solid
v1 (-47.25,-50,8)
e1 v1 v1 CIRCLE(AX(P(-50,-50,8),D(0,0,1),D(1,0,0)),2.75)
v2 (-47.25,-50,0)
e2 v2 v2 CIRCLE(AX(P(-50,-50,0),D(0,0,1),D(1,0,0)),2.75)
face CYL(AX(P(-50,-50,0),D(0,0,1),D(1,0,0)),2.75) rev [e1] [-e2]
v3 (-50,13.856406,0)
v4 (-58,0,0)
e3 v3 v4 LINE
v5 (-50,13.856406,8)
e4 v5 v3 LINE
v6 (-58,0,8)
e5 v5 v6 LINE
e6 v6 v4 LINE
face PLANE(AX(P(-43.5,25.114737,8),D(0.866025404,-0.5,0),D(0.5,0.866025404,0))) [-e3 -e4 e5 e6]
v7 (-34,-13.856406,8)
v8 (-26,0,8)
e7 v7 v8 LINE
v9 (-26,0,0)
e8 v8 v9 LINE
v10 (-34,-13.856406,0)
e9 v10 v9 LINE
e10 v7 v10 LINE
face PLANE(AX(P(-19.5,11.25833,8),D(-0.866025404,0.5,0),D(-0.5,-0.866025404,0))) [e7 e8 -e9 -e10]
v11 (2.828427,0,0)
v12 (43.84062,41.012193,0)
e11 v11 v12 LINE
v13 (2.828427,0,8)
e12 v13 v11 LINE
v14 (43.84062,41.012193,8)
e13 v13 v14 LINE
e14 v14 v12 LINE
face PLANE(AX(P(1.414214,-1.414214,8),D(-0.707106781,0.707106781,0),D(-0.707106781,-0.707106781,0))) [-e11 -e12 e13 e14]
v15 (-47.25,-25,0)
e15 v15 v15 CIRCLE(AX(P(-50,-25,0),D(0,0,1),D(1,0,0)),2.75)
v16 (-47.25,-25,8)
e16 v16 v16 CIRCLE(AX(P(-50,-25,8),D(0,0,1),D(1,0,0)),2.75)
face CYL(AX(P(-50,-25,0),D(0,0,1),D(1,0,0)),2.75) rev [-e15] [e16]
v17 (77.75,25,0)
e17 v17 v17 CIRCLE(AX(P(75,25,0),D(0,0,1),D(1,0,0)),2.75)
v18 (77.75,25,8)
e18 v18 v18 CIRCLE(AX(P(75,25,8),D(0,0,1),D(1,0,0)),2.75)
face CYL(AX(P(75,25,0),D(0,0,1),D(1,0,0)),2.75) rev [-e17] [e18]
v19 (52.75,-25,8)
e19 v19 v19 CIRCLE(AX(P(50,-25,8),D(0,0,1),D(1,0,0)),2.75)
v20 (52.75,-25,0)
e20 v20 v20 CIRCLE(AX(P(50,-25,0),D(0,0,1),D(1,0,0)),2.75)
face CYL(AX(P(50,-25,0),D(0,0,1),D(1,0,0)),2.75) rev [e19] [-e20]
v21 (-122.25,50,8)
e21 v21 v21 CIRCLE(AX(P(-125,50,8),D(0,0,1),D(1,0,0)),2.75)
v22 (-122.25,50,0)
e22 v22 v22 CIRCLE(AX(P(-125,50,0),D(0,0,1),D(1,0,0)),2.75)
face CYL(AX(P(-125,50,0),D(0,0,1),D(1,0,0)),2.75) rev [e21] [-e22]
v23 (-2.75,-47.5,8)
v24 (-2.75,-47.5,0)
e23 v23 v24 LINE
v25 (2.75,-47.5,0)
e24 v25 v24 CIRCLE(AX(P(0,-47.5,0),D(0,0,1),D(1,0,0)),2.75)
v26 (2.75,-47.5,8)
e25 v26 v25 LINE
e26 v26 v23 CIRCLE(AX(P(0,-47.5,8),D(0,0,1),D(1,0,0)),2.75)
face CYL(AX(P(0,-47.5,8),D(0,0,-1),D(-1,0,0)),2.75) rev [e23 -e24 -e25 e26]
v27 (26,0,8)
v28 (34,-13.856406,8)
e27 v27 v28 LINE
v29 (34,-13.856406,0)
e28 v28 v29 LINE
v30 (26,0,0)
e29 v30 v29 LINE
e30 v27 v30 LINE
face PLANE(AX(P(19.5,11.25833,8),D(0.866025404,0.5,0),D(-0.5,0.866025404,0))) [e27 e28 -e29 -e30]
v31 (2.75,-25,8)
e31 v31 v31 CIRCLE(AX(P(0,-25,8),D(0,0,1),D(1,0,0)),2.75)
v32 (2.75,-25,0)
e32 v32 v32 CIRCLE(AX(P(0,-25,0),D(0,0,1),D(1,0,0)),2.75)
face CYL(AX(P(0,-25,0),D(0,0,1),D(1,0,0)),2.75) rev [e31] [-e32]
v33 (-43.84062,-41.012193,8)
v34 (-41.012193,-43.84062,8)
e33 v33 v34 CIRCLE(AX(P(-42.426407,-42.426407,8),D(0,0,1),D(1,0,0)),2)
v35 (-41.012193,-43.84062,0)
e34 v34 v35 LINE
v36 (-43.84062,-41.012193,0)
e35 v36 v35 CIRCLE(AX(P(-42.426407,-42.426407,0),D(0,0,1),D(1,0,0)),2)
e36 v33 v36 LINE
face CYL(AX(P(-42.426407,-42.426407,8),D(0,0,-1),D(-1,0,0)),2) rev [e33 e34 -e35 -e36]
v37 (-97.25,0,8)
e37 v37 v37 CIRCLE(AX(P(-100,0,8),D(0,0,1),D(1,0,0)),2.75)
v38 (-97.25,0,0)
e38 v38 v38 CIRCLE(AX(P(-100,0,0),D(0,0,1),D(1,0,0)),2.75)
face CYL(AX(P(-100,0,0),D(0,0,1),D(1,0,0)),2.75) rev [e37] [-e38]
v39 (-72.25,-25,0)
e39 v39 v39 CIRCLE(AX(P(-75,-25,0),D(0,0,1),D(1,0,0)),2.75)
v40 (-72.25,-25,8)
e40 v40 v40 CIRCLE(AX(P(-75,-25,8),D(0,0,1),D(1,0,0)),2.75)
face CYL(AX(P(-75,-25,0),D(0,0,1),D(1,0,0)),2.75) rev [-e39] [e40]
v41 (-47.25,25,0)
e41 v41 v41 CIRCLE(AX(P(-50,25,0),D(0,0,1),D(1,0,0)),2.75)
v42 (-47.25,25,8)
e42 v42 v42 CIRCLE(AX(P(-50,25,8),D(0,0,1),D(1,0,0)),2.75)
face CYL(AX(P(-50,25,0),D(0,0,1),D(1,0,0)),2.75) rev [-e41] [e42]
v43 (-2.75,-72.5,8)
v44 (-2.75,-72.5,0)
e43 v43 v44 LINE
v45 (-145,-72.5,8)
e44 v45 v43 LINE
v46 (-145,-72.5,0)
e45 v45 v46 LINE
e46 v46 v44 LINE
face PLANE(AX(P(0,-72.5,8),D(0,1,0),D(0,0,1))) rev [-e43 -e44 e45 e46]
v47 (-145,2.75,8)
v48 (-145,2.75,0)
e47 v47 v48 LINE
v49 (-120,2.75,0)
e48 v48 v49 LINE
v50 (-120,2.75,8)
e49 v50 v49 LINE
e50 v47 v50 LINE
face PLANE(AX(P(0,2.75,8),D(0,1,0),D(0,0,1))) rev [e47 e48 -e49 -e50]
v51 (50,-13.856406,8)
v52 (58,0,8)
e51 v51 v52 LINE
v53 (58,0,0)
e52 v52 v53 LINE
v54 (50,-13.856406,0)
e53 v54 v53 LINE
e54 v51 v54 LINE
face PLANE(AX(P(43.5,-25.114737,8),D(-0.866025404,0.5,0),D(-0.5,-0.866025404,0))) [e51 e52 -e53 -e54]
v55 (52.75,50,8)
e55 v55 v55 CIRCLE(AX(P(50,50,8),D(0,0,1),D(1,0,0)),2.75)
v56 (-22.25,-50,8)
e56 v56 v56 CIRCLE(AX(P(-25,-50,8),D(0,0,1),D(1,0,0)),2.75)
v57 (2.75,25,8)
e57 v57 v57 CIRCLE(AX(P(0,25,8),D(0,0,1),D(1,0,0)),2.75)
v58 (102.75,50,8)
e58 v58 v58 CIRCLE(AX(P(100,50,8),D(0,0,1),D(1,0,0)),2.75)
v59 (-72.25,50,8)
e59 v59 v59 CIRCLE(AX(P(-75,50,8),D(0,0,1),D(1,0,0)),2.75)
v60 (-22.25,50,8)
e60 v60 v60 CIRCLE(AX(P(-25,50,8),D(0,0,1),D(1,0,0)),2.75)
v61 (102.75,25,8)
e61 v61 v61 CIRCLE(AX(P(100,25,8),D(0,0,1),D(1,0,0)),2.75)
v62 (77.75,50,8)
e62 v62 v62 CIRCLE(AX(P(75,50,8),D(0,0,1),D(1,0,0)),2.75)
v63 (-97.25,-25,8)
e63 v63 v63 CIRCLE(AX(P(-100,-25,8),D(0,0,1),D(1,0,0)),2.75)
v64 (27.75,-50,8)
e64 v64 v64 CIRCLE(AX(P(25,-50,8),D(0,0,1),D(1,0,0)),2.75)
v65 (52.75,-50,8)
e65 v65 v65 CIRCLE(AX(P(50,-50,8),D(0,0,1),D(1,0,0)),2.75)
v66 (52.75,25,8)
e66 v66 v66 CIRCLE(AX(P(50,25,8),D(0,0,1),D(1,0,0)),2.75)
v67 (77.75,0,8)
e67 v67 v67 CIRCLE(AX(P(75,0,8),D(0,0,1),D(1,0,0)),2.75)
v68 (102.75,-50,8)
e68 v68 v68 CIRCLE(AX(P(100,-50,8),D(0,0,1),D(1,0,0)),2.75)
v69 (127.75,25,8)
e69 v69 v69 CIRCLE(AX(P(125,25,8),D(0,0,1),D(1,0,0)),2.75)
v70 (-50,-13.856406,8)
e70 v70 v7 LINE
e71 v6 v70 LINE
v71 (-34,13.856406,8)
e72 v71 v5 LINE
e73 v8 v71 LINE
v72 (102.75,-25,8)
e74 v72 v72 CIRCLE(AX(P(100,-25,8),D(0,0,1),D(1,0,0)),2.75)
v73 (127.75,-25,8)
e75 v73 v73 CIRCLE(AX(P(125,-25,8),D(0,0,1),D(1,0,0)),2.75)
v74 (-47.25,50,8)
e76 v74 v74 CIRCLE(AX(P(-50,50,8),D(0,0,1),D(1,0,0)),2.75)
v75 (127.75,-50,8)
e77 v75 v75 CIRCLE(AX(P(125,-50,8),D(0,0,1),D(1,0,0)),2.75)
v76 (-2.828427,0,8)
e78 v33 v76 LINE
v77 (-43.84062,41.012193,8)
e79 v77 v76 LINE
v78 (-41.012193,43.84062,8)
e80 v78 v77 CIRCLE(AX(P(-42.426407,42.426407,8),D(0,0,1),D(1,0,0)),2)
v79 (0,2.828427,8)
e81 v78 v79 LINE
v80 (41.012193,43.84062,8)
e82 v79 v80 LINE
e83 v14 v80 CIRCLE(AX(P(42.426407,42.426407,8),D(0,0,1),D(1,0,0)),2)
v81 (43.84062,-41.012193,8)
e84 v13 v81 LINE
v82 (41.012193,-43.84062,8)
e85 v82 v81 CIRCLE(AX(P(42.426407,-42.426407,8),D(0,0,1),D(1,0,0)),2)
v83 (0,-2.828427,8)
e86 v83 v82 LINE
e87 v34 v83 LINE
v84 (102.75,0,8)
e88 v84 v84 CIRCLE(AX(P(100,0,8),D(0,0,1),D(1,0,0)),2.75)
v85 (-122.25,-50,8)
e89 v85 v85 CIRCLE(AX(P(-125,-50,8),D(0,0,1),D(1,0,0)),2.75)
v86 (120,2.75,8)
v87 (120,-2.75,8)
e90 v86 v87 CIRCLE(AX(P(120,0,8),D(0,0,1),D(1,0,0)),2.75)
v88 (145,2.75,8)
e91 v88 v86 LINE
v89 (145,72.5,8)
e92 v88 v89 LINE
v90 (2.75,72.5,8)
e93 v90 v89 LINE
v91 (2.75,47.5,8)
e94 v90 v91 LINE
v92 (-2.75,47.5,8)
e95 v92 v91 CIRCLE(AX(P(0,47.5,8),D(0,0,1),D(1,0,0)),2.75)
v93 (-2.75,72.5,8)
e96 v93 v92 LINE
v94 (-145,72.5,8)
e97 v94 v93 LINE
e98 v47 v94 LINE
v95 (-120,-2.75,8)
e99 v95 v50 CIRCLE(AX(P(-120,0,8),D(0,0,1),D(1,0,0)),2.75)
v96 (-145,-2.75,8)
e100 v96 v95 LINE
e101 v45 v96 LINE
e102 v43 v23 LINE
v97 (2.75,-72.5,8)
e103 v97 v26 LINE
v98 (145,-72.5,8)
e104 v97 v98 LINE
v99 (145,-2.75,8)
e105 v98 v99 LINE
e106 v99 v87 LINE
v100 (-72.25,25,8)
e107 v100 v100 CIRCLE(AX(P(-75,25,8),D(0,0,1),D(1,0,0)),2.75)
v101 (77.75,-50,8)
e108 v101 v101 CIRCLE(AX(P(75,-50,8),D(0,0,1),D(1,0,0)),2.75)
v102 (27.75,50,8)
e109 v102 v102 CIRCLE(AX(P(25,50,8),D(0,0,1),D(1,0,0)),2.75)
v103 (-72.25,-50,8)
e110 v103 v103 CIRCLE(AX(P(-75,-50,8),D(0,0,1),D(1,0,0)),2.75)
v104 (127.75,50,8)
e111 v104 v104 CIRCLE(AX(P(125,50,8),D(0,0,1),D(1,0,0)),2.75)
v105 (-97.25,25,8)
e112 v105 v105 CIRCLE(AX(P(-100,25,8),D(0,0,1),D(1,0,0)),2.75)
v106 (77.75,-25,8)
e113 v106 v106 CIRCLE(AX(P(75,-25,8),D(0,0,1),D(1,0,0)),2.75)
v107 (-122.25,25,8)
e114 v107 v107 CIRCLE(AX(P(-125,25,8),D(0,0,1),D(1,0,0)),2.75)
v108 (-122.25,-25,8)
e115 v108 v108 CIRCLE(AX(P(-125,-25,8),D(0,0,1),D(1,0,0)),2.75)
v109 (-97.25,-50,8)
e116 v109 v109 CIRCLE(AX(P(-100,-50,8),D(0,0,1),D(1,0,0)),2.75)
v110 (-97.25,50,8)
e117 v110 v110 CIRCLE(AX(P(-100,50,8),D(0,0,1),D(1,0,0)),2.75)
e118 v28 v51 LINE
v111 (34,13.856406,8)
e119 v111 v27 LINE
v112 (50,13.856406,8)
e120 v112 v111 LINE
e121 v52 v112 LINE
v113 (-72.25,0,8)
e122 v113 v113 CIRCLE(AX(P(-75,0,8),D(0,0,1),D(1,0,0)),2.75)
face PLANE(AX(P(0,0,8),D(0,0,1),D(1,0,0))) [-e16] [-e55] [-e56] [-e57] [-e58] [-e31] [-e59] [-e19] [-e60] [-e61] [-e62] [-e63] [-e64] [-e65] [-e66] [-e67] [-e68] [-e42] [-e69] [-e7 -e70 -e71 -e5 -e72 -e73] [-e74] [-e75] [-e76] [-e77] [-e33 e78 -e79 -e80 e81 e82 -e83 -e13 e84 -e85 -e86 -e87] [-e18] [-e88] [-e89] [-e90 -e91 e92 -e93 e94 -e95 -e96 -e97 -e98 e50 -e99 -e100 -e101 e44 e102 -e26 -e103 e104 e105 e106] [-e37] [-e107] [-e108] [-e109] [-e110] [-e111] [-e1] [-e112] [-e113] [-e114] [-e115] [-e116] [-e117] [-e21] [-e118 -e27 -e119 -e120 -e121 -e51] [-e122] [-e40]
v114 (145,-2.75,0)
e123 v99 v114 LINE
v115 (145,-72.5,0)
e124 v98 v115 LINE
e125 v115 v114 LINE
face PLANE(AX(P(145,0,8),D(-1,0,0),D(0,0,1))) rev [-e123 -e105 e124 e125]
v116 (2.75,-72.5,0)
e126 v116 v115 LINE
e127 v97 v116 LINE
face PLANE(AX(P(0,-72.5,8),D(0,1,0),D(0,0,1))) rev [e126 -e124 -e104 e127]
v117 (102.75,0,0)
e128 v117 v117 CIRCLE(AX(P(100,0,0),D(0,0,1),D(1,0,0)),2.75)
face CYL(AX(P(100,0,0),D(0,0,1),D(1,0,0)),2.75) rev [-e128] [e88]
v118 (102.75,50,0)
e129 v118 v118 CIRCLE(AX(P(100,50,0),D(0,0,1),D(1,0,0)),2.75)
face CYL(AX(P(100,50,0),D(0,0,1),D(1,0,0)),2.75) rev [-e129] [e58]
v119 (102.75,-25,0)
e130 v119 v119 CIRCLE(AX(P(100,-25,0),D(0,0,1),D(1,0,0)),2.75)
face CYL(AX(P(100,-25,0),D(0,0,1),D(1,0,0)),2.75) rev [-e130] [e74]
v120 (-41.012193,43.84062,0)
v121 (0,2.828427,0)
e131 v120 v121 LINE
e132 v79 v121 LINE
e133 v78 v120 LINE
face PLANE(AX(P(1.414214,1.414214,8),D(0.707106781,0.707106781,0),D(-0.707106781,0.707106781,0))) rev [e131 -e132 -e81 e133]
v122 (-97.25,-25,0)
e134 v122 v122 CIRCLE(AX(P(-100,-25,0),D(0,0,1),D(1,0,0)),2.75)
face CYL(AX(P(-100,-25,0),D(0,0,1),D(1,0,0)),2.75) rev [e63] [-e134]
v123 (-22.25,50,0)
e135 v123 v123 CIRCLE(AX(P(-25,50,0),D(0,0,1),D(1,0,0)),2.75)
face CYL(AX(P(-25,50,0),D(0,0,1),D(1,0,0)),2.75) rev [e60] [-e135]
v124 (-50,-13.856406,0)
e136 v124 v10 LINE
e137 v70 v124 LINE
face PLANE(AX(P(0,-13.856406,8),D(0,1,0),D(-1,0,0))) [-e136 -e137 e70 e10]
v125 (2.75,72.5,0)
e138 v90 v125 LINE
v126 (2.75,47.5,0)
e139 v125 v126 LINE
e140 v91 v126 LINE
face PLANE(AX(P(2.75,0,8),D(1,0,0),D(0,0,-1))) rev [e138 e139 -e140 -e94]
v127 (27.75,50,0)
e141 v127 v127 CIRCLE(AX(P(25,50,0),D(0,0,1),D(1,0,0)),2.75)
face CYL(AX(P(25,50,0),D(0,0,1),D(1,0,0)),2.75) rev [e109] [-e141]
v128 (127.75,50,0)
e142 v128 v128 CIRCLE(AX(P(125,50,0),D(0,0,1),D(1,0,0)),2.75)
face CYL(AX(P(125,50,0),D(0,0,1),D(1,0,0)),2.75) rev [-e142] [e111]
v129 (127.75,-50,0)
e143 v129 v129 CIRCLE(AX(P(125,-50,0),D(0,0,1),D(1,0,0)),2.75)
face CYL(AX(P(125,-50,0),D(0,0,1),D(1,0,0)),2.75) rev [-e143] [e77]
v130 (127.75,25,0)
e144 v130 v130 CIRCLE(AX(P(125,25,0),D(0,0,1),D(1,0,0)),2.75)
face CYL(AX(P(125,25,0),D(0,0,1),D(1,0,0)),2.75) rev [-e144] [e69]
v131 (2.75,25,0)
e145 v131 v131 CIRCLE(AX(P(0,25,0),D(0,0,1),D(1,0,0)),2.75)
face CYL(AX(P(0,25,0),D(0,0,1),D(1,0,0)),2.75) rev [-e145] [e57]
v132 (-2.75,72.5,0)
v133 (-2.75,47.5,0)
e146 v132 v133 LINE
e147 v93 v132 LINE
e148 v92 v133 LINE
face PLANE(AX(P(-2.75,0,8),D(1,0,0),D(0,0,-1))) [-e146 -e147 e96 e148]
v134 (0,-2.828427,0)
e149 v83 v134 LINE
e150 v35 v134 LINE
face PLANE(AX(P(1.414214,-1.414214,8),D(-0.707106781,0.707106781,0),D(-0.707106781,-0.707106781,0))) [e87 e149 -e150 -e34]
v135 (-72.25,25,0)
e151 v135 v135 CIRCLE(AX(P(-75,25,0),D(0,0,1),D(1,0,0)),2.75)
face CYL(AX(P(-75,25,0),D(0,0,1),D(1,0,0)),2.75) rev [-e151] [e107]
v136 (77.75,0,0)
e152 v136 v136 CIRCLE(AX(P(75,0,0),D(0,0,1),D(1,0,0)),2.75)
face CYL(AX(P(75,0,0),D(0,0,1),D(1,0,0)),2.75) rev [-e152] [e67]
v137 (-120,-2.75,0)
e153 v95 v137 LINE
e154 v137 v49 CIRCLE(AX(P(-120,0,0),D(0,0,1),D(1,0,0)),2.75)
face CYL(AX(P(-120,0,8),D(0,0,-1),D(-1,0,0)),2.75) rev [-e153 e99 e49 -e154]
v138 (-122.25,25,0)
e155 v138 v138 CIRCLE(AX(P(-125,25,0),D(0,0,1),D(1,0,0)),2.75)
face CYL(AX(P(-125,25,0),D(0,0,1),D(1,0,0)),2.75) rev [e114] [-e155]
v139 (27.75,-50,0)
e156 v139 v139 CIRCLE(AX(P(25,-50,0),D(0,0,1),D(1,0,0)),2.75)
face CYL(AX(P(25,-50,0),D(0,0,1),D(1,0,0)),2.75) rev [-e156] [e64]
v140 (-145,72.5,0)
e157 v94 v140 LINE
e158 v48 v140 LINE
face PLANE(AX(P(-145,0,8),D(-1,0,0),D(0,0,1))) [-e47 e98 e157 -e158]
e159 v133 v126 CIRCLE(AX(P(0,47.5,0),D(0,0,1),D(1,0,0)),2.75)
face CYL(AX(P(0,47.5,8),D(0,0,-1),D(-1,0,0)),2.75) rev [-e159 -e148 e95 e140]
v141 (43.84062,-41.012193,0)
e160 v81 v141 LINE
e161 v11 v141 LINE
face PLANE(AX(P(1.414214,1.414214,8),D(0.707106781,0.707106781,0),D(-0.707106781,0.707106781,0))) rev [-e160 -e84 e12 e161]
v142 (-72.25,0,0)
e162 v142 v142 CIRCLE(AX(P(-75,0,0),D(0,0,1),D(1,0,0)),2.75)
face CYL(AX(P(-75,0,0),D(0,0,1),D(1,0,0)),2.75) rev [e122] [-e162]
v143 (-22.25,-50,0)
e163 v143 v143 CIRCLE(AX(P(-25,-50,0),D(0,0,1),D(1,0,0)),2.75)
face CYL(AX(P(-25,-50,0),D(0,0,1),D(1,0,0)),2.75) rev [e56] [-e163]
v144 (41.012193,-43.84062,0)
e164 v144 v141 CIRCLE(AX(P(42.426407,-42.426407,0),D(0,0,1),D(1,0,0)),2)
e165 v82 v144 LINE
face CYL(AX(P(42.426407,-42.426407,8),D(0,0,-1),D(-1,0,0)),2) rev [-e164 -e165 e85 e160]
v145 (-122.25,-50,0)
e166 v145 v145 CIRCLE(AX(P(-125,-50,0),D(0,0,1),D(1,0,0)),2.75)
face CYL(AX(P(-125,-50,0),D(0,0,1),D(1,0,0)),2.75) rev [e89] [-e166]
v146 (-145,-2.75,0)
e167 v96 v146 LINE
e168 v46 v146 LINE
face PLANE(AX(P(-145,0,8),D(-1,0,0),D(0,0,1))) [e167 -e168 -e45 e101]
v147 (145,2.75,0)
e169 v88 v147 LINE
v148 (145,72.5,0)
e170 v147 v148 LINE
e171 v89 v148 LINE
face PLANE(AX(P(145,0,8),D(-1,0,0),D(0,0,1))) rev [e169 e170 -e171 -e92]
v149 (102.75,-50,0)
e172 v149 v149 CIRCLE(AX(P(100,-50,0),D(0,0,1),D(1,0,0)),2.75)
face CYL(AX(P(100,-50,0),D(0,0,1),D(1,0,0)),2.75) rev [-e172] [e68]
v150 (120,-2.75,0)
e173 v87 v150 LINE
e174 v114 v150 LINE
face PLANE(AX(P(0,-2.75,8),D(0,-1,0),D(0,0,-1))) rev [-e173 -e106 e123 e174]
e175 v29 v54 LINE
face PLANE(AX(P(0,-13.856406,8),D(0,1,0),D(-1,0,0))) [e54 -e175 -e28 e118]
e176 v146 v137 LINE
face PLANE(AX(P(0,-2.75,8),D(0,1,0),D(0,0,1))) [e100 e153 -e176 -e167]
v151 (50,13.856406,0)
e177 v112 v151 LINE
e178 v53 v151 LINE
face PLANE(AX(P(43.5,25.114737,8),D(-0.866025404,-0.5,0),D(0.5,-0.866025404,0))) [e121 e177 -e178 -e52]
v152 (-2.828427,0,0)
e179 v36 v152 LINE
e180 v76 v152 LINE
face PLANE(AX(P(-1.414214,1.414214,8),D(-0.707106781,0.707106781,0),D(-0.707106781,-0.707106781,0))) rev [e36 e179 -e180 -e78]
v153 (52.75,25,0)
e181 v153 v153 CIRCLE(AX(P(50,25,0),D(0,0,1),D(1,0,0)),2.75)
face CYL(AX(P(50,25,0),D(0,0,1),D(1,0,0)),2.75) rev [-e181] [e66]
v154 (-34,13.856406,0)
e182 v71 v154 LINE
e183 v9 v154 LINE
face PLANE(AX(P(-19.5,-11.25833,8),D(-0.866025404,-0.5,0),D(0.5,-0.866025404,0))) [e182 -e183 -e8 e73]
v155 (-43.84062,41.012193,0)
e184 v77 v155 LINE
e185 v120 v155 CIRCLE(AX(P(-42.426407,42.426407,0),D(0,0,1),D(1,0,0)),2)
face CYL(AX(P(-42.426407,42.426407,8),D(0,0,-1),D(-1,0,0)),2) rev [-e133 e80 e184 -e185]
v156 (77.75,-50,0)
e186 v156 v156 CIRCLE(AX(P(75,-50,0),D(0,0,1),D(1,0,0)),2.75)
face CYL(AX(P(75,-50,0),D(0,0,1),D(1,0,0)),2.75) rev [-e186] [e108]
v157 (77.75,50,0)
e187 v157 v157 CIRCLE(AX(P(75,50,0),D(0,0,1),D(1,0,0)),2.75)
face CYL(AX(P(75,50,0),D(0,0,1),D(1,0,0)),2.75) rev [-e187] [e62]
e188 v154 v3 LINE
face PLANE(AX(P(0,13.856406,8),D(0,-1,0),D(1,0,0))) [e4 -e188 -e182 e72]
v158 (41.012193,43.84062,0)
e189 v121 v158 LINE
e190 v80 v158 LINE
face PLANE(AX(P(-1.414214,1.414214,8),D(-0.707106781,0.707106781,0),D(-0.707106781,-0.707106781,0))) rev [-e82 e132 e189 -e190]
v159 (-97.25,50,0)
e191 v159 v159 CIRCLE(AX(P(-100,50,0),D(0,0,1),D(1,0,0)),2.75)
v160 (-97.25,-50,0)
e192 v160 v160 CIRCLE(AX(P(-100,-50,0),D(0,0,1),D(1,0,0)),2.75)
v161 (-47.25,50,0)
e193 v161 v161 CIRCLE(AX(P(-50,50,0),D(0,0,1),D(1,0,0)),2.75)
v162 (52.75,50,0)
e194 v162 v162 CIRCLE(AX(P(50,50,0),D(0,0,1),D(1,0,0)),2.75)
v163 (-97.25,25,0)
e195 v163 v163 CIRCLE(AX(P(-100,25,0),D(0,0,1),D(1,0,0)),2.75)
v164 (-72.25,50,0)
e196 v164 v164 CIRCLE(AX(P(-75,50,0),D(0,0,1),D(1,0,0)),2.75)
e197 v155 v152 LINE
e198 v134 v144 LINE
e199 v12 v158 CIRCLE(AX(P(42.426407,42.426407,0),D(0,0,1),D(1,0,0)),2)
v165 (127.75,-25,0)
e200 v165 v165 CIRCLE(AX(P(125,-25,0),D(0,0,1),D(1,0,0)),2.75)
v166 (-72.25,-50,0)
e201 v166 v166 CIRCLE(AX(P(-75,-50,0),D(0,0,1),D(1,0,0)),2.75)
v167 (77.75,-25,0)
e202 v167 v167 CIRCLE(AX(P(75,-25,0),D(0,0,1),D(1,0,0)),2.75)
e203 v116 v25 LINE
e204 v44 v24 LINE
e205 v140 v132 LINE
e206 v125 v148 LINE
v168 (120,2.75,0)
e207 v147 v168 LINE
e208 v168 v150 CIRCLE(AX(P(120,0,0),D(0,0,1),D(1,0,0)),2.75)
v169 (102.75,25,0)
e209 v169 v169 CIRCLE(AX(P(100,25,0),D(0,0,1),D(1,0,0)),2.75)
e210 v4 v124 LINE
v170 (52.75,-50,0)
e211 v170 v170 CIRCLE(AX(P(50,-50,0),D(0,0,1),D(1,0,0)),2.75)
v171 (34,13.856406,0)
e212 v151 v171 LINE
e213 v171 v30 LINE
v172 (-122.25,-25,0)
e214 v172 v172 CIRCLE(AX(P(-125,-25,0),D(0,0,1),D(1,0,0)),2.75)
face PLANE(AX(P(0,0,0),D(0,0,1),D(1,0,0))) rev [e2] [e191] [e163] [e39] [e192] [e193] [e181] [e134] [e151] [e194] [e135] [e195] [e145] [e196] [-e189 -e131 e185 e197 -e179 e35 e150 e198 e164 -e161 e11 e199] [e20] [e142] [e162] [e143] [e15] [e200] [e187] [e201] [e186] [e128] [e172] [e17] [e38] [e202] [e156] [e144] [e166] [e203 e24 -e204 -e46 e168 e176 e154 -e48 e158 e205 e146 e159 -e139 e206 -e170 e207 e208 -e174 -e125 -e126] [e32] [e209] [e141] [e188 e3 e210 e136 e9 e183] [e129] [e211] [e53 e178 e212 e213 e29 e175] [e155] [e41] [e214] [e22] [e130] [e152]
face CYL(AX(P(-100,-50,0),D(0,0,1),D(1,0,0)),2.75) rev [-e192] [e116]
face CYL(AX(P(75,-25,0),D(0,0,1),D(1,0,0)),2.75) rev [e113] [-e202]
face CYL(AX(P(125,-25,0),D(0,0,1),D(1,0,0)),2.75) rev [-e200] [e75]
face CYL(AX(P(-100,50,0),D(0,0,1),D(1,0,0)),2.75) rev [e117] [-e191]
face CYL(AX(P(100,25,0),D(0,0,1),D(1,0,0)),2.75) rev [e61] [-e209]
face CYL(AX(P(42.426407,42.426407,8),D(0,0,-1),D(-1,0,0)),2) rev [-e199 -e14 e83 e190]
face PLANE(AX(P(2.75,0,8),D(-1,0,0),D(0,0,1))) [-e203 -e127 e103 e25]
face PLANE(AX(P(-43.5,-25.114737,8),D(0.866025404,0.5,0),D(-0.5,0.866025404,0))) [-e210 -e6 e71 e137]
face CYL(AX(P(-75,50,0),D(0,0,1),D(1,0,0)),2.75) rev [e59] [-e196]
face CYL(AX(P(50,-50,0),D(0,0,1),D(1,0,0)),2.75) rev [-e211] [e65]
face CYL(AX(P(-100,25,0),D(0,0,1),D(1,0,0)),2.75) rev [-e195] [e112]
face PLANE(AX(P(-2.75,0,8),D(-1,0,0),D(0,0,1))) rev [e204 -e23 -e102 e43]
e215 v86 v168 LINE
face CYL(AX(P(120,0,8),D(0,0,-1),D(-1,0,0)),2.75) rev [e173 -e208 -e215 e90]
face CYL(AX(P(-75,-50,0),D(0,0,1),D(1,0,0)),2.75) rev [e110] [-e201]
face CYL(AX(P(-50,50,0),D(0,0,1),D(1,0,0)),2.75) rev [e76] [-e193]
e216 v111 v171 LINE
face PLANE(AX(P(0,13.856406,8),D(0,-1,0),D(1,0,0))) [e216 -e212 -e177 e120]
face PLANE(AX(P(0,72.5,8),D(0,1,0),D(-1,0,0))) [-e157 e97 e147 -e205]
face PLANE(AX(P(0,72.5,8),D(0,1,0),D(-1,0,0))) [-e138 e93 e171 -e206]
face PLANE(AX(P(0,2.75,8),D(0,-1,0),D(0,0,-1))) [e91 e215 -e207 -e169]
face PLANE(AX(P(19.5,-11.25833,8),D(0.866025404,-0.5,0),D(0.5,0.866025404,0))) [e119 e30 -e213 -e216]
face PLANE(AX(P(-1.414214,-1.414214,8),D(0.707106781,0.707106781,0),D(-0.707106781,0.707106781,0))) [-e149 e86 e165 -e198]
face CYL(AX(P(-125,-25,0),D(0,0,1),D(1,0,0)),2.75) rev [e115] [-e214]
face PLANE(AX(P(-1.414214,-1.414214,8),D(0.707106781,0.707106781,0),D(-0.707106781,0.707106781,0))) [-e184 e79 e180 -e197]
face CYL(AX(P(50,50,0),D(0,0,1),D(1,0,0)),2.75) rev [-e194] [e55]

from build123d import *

# Parameters (mm, degrees)
BOSS_EXTRUDE1_DEPTH     = 8
FILL_PATTERN1_OUTLINE_R = 2.75
FILL_PATTERN1_DEPTH     = 8


# Read off the part's stored shape, not the designer's step: Fill Pattern1
with BuildPart() as part:
    # Sketch1 → Boss-Extrude1 (new body)
    with BuildSketch(Plane.XY):
        with BuildLine():
            Line((-145, -2.75), (-145, -72.5))
            Line((-145, -72.5), (-2.75, -72.5))
            Line((-2.75, -72.5), (-2.75, -47.5))
            ThreePointArc((-2.75, -47.5), (0, -44.75), (2.75, -47.5))
            Line((2.75, -47.5), (2.75, -72.5))
            Line((2.75, -72.5), (145, -72.5))
            Line((145, -72.5), (145, -2.75))
            Line((145, -2.75), (120, -2.75))
            ThreePointArc((120, -2.75), (117.25, 0), (120, 2.75))
            Line((120, 2.75), (145, 2.75))
            Line((145, 2.75), (145, 72.5))
            Line((145, 72.5), (2.75, 72.5))
            Line((2.75, 72.5), (2.75, 47.5))
            ThreePointArc((2.75, 47.5), (0, 44.75), (-2.75, 47.5))
            Line((-2.75, 47.5), (-2.75, 72.5))
            Line((-2.75, 72.5), (-145, 72.5))
            Line((-145, 72.5), (-145, 2.75))
            Line((-145, 2.75), (-120, 2.75))
            ThreePointArc((-120, 2.75), (-117.25, 0), (-120, -2.75))
            Line((-120, -2.75), (-145, -2.75))
        make_face()
        with BuildLine():
            ThreePointArc((-43.840620434, 41.012193309), (-43.840620434, 43.840620434), (-41.012193309, 43.840620434))
            Line((-41.012193309, 43.840620434), (0, 2.828427125))
            Line((0, 2.828427125), (41.012193309, 43.840620434))
            ThreePointArc((41.012193309, 43.840620434), (43.840620434, 43.840620434), (43.840620434, 41.012193309))
            Line((43.840620434, 41.012193309), (2.828427125, 0))
            Line((2.828427125, 0), (43.840620434, -41.012193309))
            ThreePointArc((43.840620434, -41.012193309), (43.840620434, -43.840620434), (41.012193309, -43.840620434))
            Line((41.012193309, -43.840620434), (0, -2.828427125))
            Line((0, -2.828427125), (-41.012193309, -43.840620434))
            ThreePointArc((-41.012193309, -43.840620434), (-43.840620434, -43.840620434), (-43.840620434, -41.012193309))
            Line((-43.840620434, -41.012193309), (-2.828427125, 0))
            Line((-2.828427125, 0), (-43.840620434, 41.012193309))
        make_face(mode=Mode.SUBTRACT)
        Polygon((-50, -13.856406461), (-58, 0), (-50, 13.856406461), (-34, 13.856406461), (-26, 0), (-34, -13.856406461), align=None, mode=Mode.SUBTRACT)
        Polygon((50, 13.856406461), (58, 0), (50, -13.856406461), (34, -13.856406461), (26, 0), (34, 13.856406461), align=None, mode=Mode.SUBTRACT)
    extrude(amount=BOSS_EXTRUDE1_DEPTH)

    # Fill Pattern1 outline → Fill Pattern1 (cut)
    with BuildSketch(Plane.XY):
        with Locations((50, 50)):
            Circle(FILL_PATTERN1_OUTLINE_R)
        with Locations((-50, 25)):
            Circle(FILL_PATTERN1_OUTLINE_R)
        with Locations((-50, -25)):
            Circle(FILL_PATTERN1_OUTLINE_R)
        with Locations((-50, -50)):
            Circle(FILL_PATTERN1_OUTLINE_R)
        with Locations((125, -50)):
            Circle(FILL_PATTERN1_OUTLINE_R)
        with Locations((-25, -50)):
            Circle(FILL_PATTERN1_OUTLINE_R)
        with Locations((0, 25)):
            Circle(FILL_PATTERN1_OUTLINE_R)
        with Locations((125, -25)):
            Circle(FILL_PATTERN1_OUTLINE_R)
        with Locations((100, -50)):
            Circle(FILL_PATTERN1_OUTLINE_R)
        with Locations((25, 50)):
            Circle(FILL_PATTERN1_OUTLINE_R)
        with Locations((-75, 0)):
            Circle(FILL_PATTERN1_OUTLINE_R)
        with Locations((-75, 25)):
            Circle(FILL_PATTERN1_OUTLINE_R)
        with Locations((-75, 50)):
            Circle(FILL_PATTERN1_OUTLINE_R)
        with Locations((-75, -25)):
            Circle(FILL_PATTERN1_OUTLINE_R)
        with Locations((-75, -50)):
            Circle(FILL_PATTERN1_OUTLINE_R)
        with Locations((-25, 50)):
            Circle(FILL_PATTERN1_OUTLINE_R)
        with Locations((-50, 50)):
            Circle(FILL_PATTERN1_OUTLINE_R)
        with Locations((100, 25)):
            Circle(FILL_PATTERN1_OUTLINE_R)
        with Locations((75, 0)):
            Circle(FILL_PATTERN1_OUTLINE_R)
        with Locations((50, -25)):
            Circle(FILL_PATTERN1_OUTLINE_R)
        with Locations((0, -25)):
            Circle(FILL_PATTERN1_OUTLINE_R)
        with Locations((50, 25)):
            Circle(FILL_PATTERN1_OUTLINE_R)
        with Locations((75, 50)):
            Circle(FILL_PATTERN1_OUTLINE_R)
        with Locations((75, 25)):
            Circle(FILL_PATTERN1_OUTLINE_R)
        with Locations((100, 50)):
            Circle(FILL_PATTERN1_OUTLINE_R)
        with Locations((125, 25)):
            Circle(FILL_PATTERN1_OUTLINE_R)
        with Locations((25, -50)):
            Circle(FILL_PATTERN1_OUTLINE_R)
        with Locations((75, -50)):
            Circle(FILL_PATTERN1_OUTLINE_R)
        with Locations((100, -25)):
            Circle(FILL_PATTERN1_OUTLINE_R)
        with Locations((125, 50)):
            Circle(FILL_PATTERN1_OUTLINE_R)
        with Locations((50, -50)):
            Circle(FILL_PATTERN1_OUTLINE_R)
        with Locations((75, -25)):
            Circle(FILL_PATTERN1_OUTLINE_R)
        with Locations((100, 0)):
            Circle(FILL_PATTERN1_OUTLINE_R)
        with Locations((-125, 50)):
            Circle(FILL_PATTERN1_OUTLINE_R)
        with Locations((-100, -50)):
            Circle(FILL_PATTERN1_OUTLINE_R)
        with Locations((-100, -25)):
            Circle(FILL_PATTERN1_OUTLINE_R)
        with Locations((-100, 0)):
            Circle(FILL_PATTERN1_OUTLINE_R)
        with Locations((-100, 25)):
            Circle(FILL_PATTERN1_OUTLINE_R)
        with Locations((-125, 25)):
            Circle(FILL_PATTERN1_OUTLINE_R)
        with Locations((-125, -25)):
            Circle(FILL_PATTERN1_OUTLINE_R)
        with Locations((-125, -50)):
            Circle(FILL_PATTERN1_OUTLINE_R)
        with Locations((-100, 50)):
            Circle(FILL_PATTERN1_OUTLINE_R)
    extrude(amount=FILL_PATTERN1_DEPTH, mode=Mode.SUBTRACT)


solid = part.part
